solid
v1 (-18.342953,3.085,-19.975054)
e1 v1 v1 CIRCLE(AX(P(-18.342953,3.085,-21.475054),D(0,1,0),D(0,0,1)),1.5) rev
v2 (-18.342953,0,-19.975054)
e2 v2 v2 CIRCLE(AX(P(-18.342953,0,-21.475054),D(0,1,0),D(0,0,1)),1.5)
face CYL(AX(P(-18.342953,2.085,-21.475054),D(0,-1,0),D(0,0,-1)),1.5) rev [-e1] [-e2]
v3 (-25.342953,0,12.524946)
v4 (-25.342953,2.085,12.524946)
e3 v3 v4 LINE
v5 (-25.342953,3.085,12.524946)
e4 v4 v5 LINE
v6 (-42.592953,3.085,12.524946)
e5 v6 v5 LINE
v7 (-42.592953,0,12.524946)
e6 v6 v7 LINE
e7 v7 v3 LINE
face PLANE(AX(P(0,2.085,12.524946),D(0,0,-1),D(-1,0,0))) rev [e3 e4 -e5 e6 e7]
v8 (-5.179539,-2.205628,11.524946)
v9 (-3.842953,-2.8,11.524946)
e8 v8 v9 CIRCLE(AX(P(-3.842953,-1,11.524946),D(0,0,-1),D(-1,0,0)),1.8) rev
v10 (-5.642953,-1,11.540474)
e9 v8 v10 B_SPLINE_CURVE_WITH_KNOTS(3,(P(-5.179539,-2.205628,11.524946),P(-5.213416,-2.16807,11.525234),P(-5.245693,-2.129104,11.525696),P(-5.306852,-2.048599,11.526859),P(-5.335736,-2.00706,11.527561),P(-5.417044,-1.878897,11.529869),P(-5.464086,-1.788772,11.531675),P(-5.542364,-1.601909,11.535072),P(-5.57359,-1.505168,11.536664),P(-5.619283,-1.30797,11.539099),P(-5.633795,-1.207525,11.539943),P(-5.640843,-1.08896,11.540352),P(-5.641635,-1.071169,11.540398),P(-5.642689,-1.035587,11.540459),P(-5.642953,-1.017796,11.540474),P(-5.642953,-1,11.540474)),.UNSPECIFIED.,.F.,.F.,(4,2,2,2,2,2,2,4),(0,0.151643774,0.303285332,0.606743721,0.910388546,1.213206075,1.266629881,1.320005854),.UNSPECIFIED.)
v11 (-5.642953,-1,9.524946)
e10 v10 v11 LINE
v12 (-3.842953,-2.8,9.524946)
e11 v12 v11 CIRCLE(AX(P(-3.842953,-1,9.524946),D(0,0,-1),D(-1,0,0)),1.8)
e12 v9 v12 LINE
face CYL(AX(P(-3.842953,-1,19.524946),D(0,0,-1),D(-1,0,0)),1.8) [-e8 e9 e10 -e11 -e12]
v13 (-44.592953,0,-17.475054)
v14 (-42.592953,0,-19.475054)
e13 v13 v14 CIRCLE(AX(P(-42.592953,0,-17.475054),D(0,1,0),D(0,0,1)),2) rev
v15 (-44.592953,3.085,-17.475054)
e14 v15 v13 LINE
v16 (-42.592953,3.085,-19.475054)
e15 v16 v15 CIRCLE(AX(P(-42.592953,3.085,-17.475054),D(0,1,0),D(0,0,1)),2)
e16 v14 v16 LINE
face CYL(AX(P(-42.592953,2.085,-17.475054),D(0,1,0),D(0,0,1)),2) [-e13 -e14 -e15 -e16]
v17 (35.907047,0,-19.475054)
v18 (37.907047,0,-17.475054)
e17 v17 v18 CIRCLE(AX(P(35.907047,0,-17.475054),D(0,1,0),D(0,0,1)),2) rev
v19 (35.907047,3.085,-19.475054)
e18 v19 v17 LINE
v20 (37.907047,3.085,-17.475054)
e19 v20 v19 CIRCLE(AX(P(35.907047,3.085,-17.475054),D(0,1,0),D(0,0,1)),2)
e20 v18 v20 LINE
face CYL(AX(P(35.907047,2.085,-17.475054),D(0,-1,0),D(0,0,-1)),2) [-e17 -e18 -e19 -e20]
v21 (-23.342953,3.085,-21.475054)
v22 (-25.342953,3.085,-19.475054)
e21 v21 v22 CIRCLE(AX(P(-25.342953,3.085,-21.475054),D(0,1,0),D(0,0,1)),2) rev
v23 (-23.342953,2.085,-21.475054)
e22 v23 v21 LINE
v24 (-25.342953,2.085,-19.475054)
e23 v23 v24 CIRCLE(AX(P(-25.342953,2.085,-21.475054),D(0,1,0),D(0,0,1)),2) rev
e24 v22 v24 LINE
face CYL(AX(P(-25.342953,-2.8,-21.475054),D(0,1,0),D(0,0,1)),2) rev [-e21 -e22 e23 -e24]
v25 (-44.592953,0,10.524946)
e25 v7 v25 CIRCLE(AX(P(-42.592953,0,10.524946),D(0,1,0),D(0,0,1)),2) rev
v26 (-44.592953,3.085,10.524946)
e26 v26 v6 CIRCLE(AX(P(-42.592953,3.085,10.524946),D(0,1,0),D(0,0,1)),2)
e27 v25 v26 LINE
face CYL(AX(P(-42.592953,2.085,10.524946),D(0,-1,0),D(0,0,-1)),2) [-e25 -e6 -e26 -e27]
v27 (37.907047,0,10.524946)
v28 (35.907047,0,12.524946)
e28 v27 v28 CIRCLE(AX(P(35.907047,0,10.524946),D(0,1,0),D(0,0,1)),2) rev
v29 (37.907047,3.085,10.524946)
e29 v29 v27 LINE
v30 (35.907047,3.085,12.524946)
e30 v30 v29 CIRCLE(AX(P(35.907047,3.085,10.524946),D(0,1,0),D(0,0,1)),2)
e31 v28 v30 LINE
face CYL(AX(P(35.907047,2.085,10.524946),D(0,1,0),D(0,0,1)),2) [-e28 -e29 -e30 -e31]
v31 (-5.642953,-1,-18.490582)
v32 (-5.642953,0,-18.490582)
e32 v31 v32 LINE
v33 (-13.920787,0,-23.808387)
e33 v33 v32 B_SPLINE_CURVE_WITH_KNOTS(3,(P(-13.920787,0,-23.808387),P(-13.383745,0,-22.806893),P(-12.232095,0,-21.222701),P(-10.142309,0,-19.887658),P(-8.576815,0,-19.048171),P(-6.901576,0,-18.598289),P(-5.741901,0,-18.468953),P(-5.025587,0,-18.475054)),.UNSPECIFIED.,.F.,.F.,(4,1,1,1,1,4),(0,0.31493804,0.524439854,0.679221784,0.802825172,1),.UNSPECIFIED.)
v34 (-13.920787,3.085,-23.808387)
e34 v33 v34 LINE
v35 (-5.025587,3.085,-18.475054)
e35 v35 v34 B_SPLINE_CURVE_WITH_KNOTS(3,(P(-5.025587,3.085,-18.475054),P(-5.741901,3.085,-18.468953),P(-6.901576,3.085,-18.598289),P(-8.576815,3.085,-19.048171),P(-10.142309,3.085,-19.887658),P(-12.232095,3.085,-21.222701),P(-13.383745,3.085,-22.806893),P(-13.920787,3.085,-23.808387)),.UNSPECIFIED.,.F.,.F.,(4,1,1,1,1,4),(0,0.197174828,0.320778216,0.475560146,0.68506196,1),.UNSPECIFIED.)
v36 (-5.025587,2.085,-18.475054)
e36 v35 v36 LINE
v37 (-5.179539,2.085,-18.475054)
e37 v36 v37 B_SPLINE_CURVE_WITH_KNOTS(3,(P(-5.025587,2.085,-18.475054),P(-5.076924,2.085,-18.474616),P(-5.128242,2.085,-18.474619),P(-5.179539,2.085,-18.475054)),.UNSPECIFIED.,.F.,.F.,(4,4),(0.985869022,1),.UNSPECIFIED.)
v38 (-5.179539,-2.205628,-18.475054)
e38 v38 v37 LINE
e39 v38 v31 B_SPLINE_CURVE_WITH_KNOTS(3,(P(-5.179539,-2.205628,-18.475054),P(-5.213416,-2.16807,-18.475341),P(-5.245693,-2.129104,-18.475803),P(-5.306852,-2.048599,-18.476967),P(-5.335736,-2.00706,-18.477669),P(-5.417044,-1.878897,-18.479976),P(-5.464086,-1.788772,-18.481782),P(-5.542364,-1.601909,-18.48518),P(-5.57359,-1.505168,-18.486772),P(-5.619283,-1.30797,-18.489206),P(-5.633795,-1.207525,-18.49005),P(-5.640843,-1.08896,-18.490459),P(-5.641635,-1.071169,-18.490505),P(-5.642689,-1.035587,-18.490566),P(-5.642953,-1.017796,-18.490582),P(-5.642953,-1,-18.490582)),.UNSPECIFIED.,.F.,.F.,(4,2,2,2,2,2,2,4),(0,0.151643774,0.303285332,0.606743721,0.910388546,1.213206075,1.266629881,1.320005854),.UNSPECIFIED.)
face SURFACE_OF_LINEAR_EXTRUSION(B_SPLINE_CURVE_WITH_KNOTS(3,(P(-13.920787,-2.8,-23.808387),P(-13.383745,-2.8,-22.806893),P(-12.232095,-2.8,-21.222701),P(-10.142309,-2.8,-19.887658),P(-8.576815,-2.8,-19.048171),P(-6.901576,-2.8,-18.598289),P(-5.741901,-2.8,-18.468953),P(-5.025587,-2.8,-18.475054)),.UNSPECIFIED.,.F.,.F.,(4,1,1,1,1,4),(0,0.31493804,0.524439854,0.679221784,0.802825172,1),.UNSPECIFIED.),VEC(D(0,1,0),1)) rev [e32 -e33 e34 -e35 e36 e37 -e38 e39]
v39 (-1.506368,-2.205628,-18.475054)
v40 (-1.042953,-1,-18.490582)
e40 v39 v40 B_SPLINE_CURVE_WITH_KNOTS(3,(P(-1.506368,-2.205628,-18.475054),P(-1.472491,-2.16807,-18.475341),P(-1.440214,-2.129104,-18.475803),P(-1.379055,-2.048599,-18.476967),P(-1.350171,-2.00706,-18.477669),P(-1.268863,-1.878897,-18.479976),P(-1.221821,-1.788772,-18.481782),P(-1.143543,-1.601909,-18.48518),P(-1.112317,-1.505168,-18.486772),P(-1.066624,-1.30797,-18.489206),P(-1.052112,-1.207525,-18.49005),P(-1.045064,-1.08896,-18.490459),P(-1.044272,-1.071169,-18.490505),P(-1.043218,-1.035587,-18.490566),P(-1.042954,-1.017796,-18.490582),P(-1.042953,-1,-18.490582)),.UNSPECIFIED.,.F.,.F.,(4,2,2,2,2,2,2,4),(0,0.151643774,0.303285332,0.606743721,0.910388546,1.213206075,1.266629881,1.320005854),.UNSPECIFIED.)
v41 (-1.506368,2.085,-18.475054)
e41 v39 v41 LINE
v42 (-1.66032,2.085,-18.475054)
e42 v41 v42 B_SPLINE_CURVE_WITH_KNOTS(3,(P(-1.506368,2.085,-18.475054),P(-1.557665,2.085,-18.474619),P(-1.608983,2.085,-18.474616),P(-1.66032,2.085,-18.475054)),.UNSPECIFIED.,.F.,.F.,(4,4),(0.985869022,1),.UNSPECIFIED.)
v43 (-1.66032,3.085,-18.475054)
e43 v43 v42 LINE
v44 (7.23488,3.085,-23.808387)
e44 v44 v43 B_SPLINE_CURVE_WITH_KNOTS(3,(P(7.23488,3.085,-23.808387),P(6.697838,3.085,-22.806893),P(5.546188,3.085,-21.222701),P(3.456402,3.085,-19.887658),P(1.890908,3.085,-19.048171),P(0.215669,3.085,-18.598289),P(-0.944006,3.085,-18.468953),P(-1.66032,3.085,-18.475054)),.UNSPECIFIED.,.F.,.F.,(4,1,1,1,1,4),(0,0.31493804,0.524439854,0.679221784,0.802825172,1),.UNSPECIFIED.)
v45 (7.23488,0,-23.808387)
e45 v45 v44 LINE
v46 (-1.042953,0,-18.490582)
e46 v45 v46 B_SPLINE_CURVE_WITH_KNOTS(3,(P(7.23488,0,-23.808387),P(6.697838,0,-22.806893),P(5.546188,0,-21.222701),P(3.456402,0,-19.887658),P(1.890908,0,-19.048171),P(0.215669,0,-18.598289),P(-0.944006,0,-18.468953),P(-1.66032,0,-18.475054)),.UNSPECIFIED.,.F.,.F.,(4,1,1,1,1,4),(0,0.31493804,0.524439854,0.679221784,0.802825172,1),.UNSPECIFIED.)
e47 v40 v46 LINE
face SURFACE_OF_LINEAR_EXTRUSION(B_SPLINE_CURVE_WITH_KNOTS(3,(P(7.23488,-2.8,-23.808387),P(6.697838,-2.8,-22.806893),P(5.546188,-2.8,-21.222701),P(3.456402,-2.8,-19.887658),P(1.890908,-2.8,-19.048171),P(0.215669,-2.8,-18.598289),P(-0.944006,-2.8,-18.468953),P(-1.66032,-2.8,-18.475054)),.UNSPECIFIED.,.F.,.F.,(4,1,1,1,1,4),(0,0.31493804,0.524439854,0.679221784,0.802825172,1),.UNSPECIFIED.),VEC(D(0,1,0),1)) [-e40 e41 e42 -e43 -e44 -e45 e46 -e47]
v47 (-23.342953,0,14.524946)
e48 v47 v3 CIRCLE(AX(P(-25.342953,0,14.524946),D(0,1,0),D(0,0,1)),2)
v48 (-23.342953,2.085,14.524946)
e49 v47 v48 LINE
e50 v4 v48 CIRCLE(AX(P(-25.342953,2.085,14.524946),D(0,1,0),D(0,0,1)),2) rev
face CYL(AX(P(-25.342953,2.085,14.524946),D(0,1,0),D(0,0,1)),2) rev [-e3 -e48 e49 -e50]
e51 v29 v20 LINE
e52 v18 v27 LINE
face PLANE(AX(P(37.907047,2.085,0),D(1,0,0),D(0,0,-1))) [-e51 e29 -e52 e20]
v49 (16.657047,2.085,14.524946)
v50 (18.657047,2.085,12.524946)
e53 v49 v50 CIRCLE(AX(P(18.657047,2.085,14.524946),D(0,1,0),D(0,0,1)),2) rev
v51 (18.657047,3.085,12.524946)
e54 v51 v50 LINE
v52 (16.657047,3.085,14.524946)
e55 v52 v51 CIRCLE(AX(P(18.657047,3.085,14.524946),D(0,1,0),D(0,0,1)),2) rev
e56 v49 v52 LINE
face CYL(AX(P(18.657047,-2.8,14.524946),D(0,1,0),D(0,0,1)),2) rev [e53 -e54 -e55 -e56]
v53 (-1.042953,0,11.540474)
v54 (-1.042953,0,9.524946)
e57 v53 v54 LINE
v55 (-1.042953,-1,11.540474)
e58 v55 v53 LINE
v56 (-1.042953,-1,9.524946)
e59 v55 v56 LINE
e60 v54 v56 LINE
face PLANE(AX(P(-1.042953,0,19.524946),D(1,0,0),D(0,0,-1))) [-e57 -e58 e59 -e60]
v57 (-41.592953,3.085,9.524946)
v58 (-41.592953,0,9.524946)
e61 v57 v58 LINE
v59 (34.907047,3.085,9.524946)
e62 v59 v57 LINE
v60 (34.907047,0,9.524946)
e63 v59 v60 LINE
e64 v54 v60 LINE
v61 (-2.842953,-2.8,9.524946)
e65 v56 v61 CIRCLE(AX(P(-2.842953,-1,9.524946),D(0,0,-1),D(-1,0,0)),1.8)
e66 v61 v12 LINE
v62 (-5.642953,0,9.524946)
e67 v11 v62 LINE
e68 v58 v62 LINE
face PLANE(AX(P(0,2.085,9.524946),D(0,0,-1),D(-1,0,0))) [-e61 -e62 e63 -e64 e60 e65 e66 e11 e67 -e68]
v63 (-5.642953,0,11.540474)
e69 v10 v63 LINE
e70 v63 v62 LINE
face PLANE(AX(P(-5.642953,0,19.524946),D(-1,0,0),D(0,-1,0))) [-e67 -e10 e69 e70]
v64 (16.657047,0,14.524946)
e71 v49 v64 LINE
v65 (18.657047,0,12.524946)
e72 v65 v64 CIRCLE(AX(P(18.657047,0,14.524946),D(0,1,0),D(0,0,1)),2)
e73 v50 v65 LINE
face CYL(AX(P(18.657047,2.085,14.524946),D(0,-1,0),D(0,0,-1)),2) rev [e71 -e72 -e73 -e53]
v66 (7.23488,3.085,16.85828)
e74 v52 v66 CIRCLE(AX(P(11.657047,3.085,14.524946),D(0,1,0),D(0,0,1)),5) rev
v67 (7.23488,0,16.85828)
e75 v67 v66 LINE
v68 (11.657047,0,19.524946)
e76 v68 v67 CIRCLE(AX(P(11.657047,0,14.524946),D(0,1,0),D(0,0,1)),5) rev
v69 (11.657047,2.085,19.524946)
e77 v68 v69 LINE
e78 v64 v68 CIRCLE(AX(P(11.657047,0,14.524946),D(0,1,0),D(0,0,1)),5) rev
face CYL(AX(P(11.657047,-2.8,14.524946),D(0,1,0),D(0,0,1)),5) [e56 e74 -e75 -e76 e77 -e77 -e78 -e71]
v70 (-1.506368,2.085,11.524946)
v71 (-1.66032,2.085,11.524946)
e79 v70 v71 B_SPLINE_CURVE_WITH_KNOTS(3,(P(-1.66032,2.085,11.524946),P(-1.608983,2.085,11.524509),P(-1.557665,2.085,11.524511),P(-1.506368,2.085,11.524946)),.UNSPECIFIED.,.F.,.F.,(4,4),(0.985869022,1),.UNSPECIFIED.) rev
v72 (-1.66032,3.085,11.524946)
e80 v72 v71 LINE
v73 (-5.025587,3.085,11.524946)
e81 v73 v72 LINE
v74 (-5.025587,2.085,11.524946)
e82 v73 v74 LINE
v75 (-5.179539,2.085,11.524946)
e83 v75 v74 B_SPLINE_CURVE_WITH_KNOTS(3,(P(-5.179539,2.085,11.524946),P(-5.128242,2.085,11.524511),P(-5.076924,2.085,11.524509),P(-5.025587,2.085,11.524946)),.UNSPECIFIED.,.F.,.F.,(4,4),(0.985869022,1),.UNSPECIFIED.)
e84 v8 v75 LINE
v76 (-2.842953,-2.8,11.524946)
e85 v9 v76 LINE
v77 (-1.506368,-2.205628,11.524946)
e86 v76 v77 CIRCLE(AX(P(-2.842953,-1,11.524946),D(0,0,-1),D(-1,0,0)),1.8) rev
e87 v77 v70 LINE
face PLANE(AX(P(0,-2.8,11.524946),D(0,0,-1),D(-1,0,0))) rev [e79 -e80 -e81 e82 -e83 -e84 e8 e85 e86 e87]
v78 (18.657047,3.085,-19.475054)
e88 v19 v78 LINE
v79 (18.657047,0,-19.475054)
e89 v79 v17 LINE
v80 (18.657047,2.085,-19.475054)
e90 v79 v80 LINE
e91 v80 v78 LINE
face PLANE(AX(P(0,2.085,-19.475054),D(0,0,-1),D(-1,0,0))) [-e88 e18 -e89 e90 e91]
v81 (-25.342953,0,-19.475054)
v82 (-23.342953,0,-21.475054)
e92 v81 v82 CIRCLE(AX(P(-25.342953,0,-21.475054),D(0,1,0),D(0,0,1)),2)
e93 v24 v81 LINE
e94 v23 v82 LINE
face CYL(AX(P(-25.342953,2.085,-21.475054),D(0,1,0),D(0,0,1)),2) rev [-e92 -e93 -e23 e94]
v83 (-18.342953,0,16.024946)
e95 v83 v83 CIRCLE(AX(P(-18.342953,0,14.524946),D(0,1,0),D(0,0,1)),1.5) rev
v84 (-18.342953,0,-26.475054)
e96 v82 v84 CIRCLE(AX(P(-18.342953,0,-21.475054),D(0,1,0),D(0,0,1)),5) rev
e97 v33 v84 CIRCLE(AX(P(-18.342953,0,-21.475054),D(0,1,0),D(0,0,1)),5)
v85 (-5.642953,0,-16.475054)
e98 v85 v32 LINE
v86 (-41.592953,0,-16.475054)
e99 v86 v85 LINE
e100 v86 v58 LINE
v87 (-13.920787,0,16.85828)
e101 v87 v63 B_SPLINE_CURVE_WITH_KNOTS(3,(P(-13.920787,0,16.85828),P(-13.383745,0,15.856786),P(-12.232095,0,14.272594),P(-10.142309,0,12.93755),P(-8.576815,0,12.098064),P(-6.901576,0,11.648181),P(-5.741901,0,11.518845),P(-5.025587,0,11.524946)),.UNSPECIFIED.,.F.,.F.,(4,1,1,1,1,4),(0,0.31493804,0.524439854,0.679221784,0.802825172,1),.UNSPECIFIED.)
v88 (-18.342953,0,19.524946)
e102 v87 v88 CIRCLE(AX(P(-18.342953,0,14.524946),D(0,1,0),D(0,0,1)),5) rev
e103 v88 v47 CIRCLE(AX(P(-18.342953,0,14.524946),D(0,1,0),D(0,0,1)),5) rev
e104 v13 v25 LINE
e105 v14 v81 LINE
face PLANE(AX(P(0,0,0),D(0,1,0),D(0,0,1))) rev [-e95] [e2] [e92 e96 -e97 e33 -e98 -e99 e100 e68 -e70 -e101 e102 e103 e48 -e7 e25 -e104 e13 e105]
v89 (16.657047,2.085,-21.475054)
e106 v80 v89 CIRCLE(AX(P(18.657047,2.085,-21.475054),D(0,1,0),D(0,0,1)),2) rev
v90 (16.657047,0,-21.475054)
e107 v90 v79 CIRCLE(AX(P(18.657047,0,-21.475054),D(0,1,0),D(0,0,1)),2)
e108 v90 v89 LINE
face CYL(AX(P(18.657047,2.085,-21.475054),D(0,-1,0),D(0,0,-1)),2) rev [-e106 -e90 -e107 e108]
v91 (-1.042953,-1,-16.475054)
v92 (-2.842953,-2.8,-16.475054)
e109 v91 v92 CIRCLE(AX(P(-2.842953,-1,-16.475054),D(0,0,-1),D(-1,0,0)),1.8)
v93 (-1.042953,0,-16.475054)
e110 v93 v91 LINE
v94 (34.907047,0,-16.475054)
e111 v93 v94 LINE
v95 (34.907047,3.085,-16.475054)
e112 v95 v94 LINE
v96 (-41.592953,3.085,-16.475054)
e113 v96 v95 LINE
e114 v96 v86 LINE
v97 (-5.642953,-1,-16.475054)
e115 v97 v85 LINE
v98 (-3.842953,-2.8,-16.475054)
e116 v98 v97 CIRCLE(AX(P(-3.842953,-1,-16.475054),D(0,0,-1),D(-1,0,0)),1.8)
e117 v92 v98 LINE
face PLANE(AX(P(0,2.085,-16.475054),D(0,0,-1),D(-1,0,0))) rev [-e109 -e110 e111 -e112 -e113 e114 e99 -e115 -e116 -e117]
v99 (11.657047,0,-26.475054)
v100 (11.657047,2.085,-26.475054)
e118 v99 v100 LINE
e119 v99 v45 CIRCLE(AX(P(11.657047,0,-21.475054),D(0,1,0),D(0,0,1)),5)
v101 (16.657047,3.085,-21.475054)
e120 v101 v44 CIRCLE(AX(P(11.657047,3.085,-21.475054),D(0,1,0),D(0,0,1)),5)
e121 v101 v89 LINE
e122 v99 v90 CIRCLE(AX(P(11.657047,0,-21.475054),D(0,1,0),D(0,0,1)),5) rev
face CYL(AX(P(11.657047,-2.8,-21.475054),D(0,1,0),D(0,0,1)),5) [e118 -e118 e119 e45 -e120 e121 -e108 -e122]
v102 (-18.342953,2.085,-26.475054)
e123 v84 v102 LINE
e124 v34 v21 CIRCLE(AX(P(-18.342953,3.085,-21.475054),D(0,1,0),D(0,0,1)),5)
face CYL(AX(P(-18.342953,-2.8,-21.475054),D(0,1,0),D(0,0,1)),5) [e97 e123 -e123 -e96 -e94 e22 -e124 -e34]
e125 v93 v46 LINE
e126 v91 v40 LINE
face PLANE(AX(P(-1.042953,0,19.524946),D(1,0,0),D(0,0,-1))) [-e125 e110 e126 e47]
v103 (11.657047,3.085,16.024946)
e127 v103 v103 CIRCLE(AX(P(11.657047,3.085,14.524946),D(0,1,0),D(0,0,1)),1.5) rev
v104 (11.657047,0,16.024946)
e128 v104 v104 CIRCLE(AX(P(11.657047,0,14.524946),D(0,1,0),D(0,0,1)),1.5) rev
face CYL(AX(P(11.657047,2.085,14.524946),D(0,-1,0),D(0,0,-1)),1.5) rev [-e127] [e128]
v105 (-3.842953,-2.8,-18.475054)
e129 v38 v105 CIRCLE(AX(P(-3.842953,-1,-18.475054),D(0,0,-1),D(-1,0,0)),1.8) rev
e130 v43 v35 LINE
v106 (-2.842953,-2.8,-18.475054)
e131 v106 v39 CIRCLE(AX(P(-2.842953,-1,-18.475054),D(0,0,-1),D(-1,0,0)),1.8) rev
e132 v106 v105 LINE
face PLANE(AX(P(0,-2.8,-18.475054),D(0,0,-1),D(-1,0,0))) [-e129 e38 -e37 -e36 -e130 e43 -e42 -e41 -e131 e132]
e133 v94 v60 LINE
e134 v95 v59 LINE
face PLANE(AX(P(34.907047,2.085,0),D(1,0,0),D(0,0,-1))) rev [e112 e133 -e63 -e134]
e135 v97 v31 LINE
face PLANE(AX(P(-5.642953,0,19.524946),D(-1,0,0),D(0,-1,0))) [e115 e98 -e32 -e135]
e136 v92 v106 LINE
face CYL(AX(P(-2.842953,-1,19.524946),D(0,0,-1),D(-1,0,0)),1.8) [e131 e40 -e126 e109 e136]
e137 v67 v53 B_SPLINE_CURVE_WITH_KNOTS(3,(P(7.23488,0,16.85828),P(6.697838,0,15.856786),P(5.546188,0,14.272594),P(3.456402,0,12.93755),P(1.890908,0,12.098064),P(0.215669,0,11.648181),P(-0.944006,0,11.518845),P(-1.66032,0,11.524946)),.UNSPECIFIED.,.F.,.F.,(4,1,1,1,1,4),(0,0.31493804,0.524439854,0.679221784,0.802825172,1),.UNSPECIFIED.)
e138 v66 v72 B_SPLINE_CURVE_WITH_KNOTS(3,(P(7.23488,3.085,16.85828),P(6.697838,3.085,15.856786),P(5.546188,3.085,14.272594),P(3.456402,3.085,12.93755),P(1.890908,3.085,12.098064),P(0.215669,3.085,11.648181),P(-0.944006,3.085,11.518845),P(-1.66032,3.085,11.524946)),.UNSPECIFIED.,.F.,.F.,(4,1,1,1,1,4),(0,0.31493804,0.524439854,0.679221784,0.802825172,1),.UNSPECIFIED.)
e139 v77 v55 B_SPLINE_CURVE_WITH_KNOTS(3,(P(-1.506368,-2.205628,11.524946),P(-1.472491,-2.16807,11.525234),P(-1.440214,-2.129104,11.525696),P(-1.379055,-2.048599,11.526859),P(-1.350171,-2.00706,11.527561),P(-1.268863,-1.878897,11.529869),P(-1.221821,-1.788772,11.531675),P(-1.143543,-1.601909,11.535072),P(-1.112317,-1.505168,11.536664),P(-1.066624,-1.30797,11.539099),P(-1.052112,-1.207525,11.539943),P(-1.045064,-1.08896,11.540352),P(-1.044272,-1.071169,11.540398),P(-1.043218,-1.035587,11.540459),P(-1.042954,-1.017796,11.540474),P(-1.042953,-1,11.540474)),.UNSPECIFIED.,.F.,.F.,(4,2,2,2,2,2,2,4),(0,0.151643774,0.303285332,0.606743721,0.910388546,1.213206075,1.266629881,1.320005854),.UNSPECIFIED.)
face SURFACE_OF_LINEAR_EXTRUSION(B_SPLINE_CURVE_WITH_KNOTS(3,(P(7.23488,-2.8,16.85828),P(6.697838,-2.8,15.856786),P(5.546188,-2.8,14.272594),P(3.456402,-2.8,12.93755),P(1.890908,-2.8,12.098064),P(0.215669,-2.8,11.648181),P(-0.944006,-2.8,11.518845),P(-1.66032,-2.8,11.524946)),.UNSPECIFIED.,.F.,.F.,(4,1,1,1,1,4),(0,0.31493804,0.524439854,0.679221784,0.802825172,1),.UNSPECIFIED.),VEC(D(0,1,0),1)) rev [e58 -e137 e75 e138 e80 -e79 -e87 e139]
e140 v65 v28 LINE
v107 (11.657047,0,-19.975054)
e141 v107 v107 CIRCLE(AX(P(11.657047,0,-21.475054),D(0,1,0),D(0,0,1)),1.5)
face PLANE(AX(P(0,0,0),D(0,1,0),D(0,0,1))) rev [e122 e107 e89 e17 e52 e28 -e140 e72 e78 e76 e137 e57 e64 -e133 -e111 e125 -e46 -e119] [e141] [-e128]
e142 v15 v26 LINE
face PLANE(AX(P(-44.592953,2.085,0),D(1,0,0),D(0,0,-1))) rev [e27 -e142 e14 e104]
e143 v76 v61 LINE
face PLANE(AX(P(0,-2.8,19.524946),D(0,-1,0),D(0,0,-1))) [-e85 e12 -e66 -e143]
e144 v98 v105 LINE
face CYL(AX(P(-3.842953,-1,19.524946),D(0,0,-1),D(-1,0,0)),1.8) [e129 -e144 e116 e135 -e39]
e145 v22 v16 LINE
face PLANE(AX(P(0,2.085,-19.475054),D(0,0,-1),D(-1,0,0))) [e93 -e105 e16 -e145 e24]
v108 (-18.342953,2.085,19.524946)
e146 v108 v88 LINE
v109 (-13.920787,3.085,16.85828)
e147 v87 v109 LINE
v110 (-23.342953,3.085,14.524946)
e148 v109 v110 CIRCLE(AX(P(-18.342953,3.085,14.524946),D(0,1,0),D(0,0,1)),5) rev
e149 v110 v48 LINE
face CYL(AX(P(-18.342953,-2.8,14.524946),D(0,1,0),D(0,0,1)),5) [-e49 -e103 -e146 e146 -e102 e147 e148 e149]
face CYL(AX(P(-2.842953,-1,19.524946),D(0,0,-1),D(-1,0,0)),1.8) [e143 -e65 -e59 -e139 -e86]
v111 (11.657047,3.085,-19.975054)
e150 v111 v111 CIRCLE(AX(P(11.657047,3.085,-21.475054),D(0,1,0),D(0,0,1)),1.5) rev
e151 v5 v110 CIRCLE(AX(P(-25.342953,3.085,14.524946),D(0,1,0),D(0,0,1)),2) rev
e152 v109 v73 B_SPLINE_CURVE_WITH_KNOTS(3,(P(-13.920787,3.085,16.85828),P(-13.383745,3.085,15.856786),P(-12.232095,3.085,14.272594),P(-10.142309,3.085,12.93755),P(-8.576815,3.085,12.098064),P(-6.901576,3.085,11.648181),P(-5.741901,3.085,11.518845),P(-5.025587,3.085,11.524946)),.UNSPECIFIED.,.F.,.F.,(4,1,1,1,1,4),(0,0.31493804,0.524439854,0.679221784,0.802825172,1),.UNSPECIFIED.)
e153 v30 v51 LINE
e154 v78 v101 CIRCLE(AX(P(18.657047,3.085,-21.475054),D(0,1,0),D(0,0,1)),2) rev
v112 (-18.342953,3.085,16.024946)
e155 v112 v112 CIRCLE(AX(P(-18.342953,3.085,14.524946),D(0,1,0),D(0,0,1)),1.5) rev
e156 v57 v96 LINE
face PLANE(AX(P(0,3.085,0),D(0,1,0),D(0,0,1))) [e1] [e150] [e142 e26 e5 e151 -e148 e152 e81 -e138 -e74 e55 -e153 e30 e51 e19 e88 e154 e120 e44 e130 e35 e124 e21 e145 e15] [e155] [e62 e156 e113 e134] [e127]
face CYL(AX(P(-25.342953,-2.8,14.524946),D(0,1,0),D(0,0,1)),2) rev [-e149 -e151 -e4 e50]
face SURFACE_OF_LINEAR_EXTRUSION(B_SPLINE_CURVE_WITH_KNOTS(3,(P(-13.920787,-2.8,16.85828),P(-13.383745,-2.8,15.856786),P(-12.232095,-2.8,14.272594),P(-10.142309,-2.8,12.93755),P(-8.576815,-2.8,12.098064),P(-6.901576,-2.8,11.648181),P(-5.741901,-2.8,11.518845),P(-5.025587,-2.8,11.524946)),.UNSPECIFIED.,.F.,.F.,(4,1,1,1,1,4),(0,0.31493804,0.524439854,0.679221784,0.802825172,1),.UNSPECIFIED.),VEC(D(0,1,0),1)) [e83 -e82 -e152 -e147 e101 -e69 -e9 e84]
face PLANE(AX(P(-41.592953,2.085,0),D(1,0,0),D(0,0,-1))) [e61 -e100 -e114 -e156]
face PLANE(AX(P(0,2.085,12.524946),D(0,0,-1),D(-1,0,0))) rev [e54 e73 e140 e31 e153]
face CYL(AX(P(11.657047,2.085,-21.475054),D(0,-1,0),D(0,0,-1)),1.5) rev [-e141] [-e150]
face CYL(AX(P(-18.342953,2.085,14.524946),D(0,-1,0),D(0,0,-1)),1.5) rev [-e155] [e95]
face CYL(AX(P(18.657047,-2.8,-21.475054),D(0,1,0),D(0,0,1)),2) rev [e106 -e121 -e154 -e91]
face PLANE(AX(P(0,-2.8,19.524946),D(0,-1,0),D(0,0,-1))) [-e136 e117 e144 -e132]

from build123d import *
from build123d.topology import SkipClean

# Parameters (mm, degrees)
SKETCH1_W           = 40
SKETCH1_H           = 7
SKETCH1_R           = 1.5
SKETCH1_W_2         = 82.5
SKETCH1_H_2         = 32
SKETCH1_W_3         = 76.5
SKETCH1_H_3         = 26
BOSS_EXTRUDE1_DEPTH = 2.085
SKETCH2_W           = 5
SKETCH2_H           = 10
BOSS_EXTRUDE2_DEPTH = 3
FILLET1_R           = 2
FILLET2_R           = 2
CUT_EXTRUDE1_DEPTH  = 65.136818612
SKETCH4_W           = 30
SKETCH4_H           = 6.817038716
CUT_EXTRUDE2_DEPTH  = 53.089568977
FILLET3_R           = 5
FILLET4_R           = 2
BOSS_EXTRUDE3_START = 1
SKETCH5_R           = 1.5
BOSS_EXTRUDE3_DEPTH = 1
FILLET5_START       = 2.085
FILLET5_DEPTH       = 1


with BuildPart() as part:
    # Sketch1 → Boss-Extrude1 (new body)
    # profile 1 of 3: a face of its own
    with BuildSketch(Plane(origin=(0, 0, 0), x_dir=(1, 0, 0), z_dir=(0, 1, 0))):
        with Locations((-3.342953498, -16.024946279)):
            Rectangle(SKETCH1_W, SKETCH1_H)
        with Locations(Location((-18.342953498, -14.524946279, 0), (0, 0, 270))):
            Circle(SKETCH1_R, mode=Mode.SUBTRACT)
        with Locations(Location((11.657046502, -14.524946279, 0), (0, 0, 270))):
            Circle(SKETCH1_R, mode=Mode.SUBTRACT)
    # profile 2 of 3: a face of its own
    with BuildSketch(Plane(origin=(0, 0, 0), x_dir=(1, 0, 0), z_dir=(0, 1, 0))):
        with Locations((-3.342953498, 3.475053721)):
            Rectangle(SKETCH1_W_2, SKETCH1_H_2)
        with Locations((-3.342953498, 3.475053721)):
            Rectangle(SKETCH1_W_3, SKETCH1_H_3, mode=Mode.SUBTRACT)
    # profile 3 of 3: a face of its own
    with BuildSketch(Plane(origin=(0, 0, 0), x_dir=(1, 0, 0), z_dir=(0, 1, 0))):
        with Locations((-3.342953498, 22.975053721)):
            Rectangle(SKETCH1_W, SKETCH1_H)
        with Locations(Location((-18.342953498, 21.475053721, 0), (0, 0, 270))):
            Circle(SKETCH1_R, mode=Mode.SUBTRACT)
        with Locations(Location((11.657046502, 21.475053721, 0), (0, 0, 270))):
            Circle(SKETCH1_R, mode=Mode.SUBTRACT)
    extrude(amount=BOSS_EXTRUDE1_DEPTH)

    # Sketch2 → Boss-Extrude2 (add)
    with BuildSketch(Plane.XZ):
        with Locations((-3.342953498, 14.524946279)):
            Rectangle(SKETCH2_W, SKETCH2_H)
        with Locations((-3.342953498, -21.475053721)):
            Rectangle(SKETCH2_W, SKETCH2_H)
    extrude(amount=BOSS_EXTRUDE2_DEPTH)

    # Fillet1
    fillet1_edges = [part.edges().sort_by_distance(p)[0] for p in [
        (-5.842953498, -3, 14.524946279),
        (-0.842953498, -3, 14.524946279),
        (-0.842953498, -3, -21.475053721),
        (-5.842953498, -3, -21.475053721),
    ]]
    fillet(fillet1_edges, radius=FILLET1_R)

    # Fillet2
    fillet2_edges = [part.edges().sort_by_distance(p)[0] for p in [
        (-44.592953498, 1.0425, 12.524946279),
        (-44.592953498, 1.0425, -19.475053721),
        (37.907046502, 1.0425, -19.475053721),
        (37.907046502, 1.0425, 12.524946279),
    ]]
    fillet(fillet2_edges, radius=FILLET2_R)

    # Sketch3 → Cut-Extrude1 (cut, through all)
    with BuildSketch(Plane(origin=(0, 0, -26.475053721), x_dir=(-1, 0, 0), z_dir=(0, 0, -1))):
        with BuildLine():
            Line((5.842953498, -1), (5.842953498, 0))
            Line((5.842953498, 0), (5.642953498, 0))
            Line((5.642953498, 0), (5.642953498, -1))
            ThreePointArc((5.642953498, -1), (5.115745704, -2.272792206), (3.842953498, -2.8))
            Line((3.842953498, -2.8), (2.842953498, -2.8))
            ThreePointArc((2.842953498, -2.8), (1.570161291, -2.272792206), (1.042953498, -1))
            Line((1.042953498, -1), (1.042953498, 0))
            Line((1.042953498, 0), (0.842953498, 0))
            Line((0.842953498, 0), (0.842953498, -1))
            ThreePointArc((0.842953498, -1), (1.428739935, -2.414213562), (2.842953498, -3))
            Line((2.842953498, -3), (3.842953498, -3))
            ThreePointArc((3.842953498, -3), (5.25716706, -2.414213562), (5.842953498, -1))
        make_face()
    extrude(amount=-CUT_EXTRUDE1_DEPTH, mode=Mode.SUBTRACT)

    # Sketch4 → Cut-Extrude2 (cut, through all)
    with BuildSketch(Plane(origin=(0, 2.085, 0), x_dir=(1, 0, 0), z_dir=(0, 1, 0))):
        with BuildLine():
            Line((-5.025587433, 18.475053721), (-3.342953498, 18.475053721))
            Line((-3.342953498, 18.475053721), (-1.660319563, 18.475053721))
            Line((-1.660319563, 18.475053721), (-1.5063675, 18.475053721))
            add(Edge.make_bspline(
                [(7.234880115, 23.808387054), (6.697838422, 22.80689338), (5.54618786, 21.222701251), (3.456402004, 19.887657692), (1.890908212, 19.048171258), (0.265447838, 18.611656881), (-0.841891354, 18.480685845), (-1.5063675, 18.475053721)],
                knots=[0, 0, 0, 0, 0.31493804, 0.524439854, 0.679221784, 0.802825172, 0.985869019, 0.985869019, 0.985869019, 0.985869019], degree=3))
            ThreePointArc((7.234880115, 23.808387054), (9.075057605, 25.756797914), (11.657046502, 26.475053721))
            Line((11.657046502, 26.475053721), (-18.342953498, 26.475053721))
            ThreePointArc((-18.342953498, 26.475053721), (-15.7609646, 25.756797914), (-13.92078711, 23.808387054))
            add(Edge.make_bspline(
                [(-13.92078711, 23.808387054), (-13.383745417, 22.80689338), (-12.232094855, 21.222701251), (-10.142308999, 19.887657692), (-8.576815207, 19.048171258), (-6.951354833, 18.611656881), (-5.844015641, 18.480685845), (-5.179539495, 18.475053721)],
                knots=[0, 0, 0, 0, 0.31493804, 0.524439854, 0.679221784, 0.802825172, 0.985869019, 0.985869019, 0.985869019, 0.985869019], degree=3))
            Line((-5.179539495, 18.475053721), (-5.025587433, 18.475053721))
        make_face()
        with Locations((-3.342953498, 29.883573079)):
            Rectangle(SKETCH4_W, SKETCH4_H)
        with BuildLine():
            ThreePointArc((-13.92078711, -16.858279612), (-15.7609646, -18.806690472), (-18.342953498, -19.524946279))
            Line((-18.342953498, -19.524946279), (11.657046502, -19.524946279))
            ThreePointArc((11.657046502, -19.524946279), (9.075057605, -18.806690472), (7.234880115, -16.858279612))
            add(Edge.make_bspline(
                [(7.234880115, -16.858279612), (6.697838422, -15.856785937), (5.54618786, -14.272593809), (3.456402004, -12.937550249), (1.890908212, -12.098063816), (0.265447838, -11.661549439), (-0.841891354, -11.530578403), (-1.5063675, -11.524946279)],
                knots=[0, 0, 0, 0, 0.31493804, 0.524439854, 0.679221784, 0.802825172, 0.985869019, 0.985869019, 0.985869019, 0.985869019], degree=3))
            Line((-1.5063675, -11.524946279), (-1.660319563, -11.524946279))
            Line((-1.660319563, -11.524946279), (-3.342953498, -11.524946279))
            Line((-3.342953498, -11.524946279), (-5.025587433, -11.524946279))
            Line((-5.025587433, -11.524946279), (-5.179539495, -11.524946279))
            add(Edge.make_bspline(
                [(-13.92078711, -16.858279612), (-13.383745417, -15.856785937), (-12.232094855, -14.272593809), (-10.142308999, -12.937550249), (-8.576815207, -12.098063816), (-6.951354833, -11.661549439), (-5.844015641, -11.530578403), (-5.179539495, -11.524946279)],
                knots=[0, 0, 0, 0, 0.31493804, 0.524439854, 0.679221784, 0.802825172, 0.985869019, 0.985869019, 0.985869019, 0.985869019], degree=3))
        make_face()
        with Locations((-3.342953498, -22.933465637)):
            Rectangle(SKETCH4_W, SKETCH4_H)
    extrude(amount=-CUT_EXTRUDE2_DEPTH, mode=Mode.SUBTRACT)

    # Fillet3
    fillet3_edges = [part.edges().sort_by_distance(p)[0] for p in [
        (16.657046502, 1.0425, -26.475053721),
        (-23.342953498, 1.0425, -26.475053721),
        (-23.342953498, 1.0425, 19.524946279),
        (16.657046502, 1.0425, 19.524946279),
    ]]
    fillet(fillet3_edges, radius=FILLET3_R - 0.0001)  # a hair under: the kernel refuses the full size

    # Fillet4
    fillet4_edges = [part.edges().sort_by_distance(p)[0] for p in [
        (-23.342953498, 1.0425, 12.524946279),
        (-23.342953498, 1.0425, -19.475053721),
        (16.657046502, 1.0425, -19.475053721),
        (16.657046502, 1.0425, 12.524946279),
    ]]
    fillet(fillet4_edges, radius=FILLET4_R)

    # Sketch5 → Boss-Extrude3 (add)
    # profile 1 of 26: a face of its own
    with SkipClean():  # the faces are left unmerged after this step: merging them gives an invalid solid
        with BuildSketch(Plane(origin=(0, 2.085, 0), x_dir=(1, 0, 0), z_dir=(0, 1, 0)).offset(BOSS_EXTRUDE3_START)):
            with BuildLine():
                ThreePointArc((-18.343003498, 26.475053721), (-21.878490939, 25.010584091), (-23.342953497, 21.475093721))
                ThreePointArc((-23.342953497, 21.475093721), (-23.237489148, 20.453525081), (-22.925529193, 19.475053721))
                Line((-22.925529193, 19.475053721), (-14.342953498, 19.475053721))
                Line((-14.342953498, 19.475053721), (-14.342953498, 24.475053721))
                ThreePointArc((-14.342953498, 24.475053721), (-16.106907881, 25.947200856), (-18.343003498, 26.475053721))
            make_face()
            with Locations((-18.342953498, 21.475053721)):
                Circle(SKETCH5_R, mode=Mode.SUBTRACT)
        # profile 2 of 26: a face of its own
        with BuildSketch(Plane(origin=(0, 2.085, 0), x_dir=(1, 0, 0), z_dir=(0, 1, 0)).offset(BOSS_EXTRUDE3_START)):
            with BuildLine():
                Line((-22.925529193, 19.475053721), (-23.342953498, 19.475053721))
                Line((-23.342953498, 19.475053721), (-23.342953498, 16.475053721))
                Line((-23.342953498, 16.475053721), (-18.342953499, 16.475053721))
                ThreePointArc((-18.342953499, 16.475053721), (-21.081566286, 17.291753589), (-22.925529193, 19.475053721))
            make_face()
        # profile 3 of 26: a face of its own
        with BuildSketch(Plane(origin=(0, 2.085, 0), x_dir=(1, 0, 0), z_dir=(0, 1, 0)).offset(BOSS_EXTRUDE3_START)):
            with BuildLine():
                Line((-23.342953498, 16.475053721), (-23.342953498, 19.475053721))
                Line((-23.342953498, 19.475053721), (-25.342953498, 19.475053721))
                Line((-25.342953498, 19.475053721), (-42.592953498, 19.475053721))
                ThreePointArc((-42.592953498, 19.475053721), (-44.00716706, 18.889267283), (-44.592953498, 17.475053721))
                Line((-44.592953498, 17.475053721), (-44.592953498, -10.524946279))
                ThreePointArc((-44.592953498, -10.524946279), (-44.00716706, -11.939159841), (-42.592953498, -12.524946279))
                Line((-42.592953498, -12.524946279), (-25.342953498, -12.524946279))
                Line((-25.342953498, -12.524946279), (-23.342953498, -12.524946279))
                Line((-23.342953498, -12.524946279), (-23.342953498, -9.524946279))
                Line((-23.342953498, -9.524946279), (-41.592953498, -9.524946279))
                Line((-41.592953498, -9.524946279), (-41.592953498, 16.475053721))
                Line((-41.592953498, 16.475053721), (-23.342953498, 16.475053721))
            make_face()
        # profile 4 of 26: a face of its own
        with BuildSketch(Plane(origin=(0, 2.085, 0), x_dir=(1, 0, 0), z_dir=(0, 1, 0)).offset(BOSS_EXTRUDE3_START)):
            with BuildLine():
                Line((-14.342953498, 19.475053721), (-22.925529193, 19.475053721))
                ThreePointArc((-22.925529193, 19.475053721), (-21.081566286, 17.291753589), (-18.342953499, 16.475053721))
                ThreePointArc((-18.342953499, 16.475053721), (-16.106885521, 17.002917766), (-14.342953498, 18.475053721))
                Line((-14.342953498, 18.475053721), (-14.342953498, 19.475053721))
            make_face()
        # profile 5 of 26: a face of its own
        with BuildSketch(Plane(origin=(0, 2.085, 0), x_dir=(1, 0, 0), z_dir=(0, 1, 0)).offset(BOSS_EXTRUDE3_START)):
            with BuildLine():
                ThreePointArc((-13.92078711, 23.808387054), (-14.118698205, 24.150061614), (-14.342953498, 24.475053721))
                Line((-14.342953498, 24.475053721), (-14.342953498, 19.475053721))
                Line((-14.342953498, 19.475053721), (-13.760377803, 19.475053721))
                ThreePointArc((-13.760377803, 19.475053721), (-13.448421933, 20.453505503), (-13.342953498, 21.475053721))
                ThreePointArc((-13.342953498, 21.475053721), (-13.489561285, 22.676962217), (-13.92078711, 23.808387054))
            make_face()
        # profile 6 of 26: a face of its own
        with BuildSketch(Plane(origin=(0, 2.085, 0), x_dir=(1, 0, 0), z_dir=(0, 1, 0)).offset(BOSS_EXTRUDE3_START)):
            with BuildLine():
                Line((-13.760377803, 19.475053721), (-14.342953498, 19.475053721))
                Line((-14.342953498, 19.475053721), (-14.342953498, 18.475053721))
                ThreePointArc((-14.342953498, 18.475053721), (-14.022635061, 18.958141206), (-13.760377803, 19.475053721))
            make_face()
        # profile 7 of 26: a face of its own
        with BuildSketch(Plane(origin=(0, 2.085, 0), x_dir=(1, 0, 0), z_dir=(0, 1, 0)).offset(BOSS_EXTRUDE3_START)):
            with BuildLine():
                ThreePointArc((-14.342953498, 18.475053721), (-16.106885521, 17.002917766), (-18.342953499, 16.475053721))
                Line((-18.342953499, 16.475053721), (11.657046523, 16.475053721))
                ThreePointArc((11.657046523, 16.475053721), (9.420978534, 17.002917762), (7.657046502, 18.475053721))
                Line((7.657046502, 18.475053721), (-1.5063675, 18.475053721))
                add(Edge.make_bspline(
                    [(-1.5063675, 18.475053721), (-1.557665042, 18.474618921), (-1.608983344, 18.47461649), (-1.660319563, 18.475053721)],
                    knots=[0.985869019, 0.985869019, 0.985869019, 0.985869019, 1, 1, 1, 1], degree=3))
                Line((-1.660319563, 18.475053721), (-3.342953498, 18.475053721))
                Line((-3.342953498, 18.475053721), (-5.025587433, 18.475053721))
                add(Edge.make_bspline(
                    [(-5.179539495, 18.475053721), (-5.128241953, 18.474618921), (-5.076923651, 18.47461649), (-5.025587433, 18.475053721)],
                    knots=[0.985869019, 0.985869019, 0.985869019, 0.985869019, 1, 1, 1, 1], degree=3))
                Line((-5.179539495, 18.475053721), (-14.342953498, 18.475053721))
            make_face()
        # profile 8 of 26: a face of its own
        with BuildSketch(Plane(origin=(0, 2.085, 0), x_dir=(1, 0, 0), z_dir=(0, 1, 0)).offset(BOSS_EXTRUDE3_START)):
            with BuildLine():
                add(Edge.make_bspline(
                    [(-13.92078711, 23.808387054), (-13.383745417, 22.80689338), (-12.232094855, 21.222701251), (-10.424029044, 20.067632367), (-9.557996846, 19.581589064), (-9.354549961, 19.475053721)],
                    knots=[0, 0, 0, 0, 0.31493804, 0.524439854, 0.587657191, 0.587657191, 0.587657191, 0.587657191], degree=3))
                ThreePointArc((-13.92078711, 23.808387054), (-13.489561285, 22.676962217), (-13.342953498, 21.475053721))
                ThreePointArc((-13.342953498, 21.475053721), (-13.448421933, 20.453505503), (-13.760377803, 19.475053721))
                Line((-13.760377803, 19.475053721), (-9.354549961, 19.475053721))
            make_face()
        # profile 9 of 26: a face of its own
        with BuildSketch(Plane(origin=(0, 2.085, 0), x_dir=(1, 0, 0), z_dir=(0, 1, 0)).offset(BOSS_EXTRUDE3_START)):
            with BuildLine():
                ThreePointArc((-13.760377803, 19.475053721), (-14.022635061, 18.958141206), (-14.342953498, 18.475053721))
                Line((-14.342953498, 18.475053721), (-5.179539495, 18.475053721))
                add(Edge.make_bspline(
                    [(-9.354549961, 19.475053721), (-9.059875559, 19.320746917), (-8.354121704, 18.98836733), (-6.951354833, 18.611656881), (-5.844015641, 18.480685845), (-5.179539495, 18.475053721)],
                    knots=[0.587657191, 0.587657191, 0.587657191, 0.587657191, 0.679221784, 0.802825172, 0.985869019, 0.985869019, 0.985869019, 0.985869019], degree=3))
                Line((-9.354549961, 19.475053721), (-13.760377803, 19.475053721))
            make_face()
        # profile 10 of 26: a face of its own
        with BuildSketch(Plane(origin=(0, 2.085, 0), x_dir=(1, 0, 0), z_dir=(0, 1, 0)).offset(BOSS_EXTRUDE3_START)):
            with BuildLine():
                ThreePointArc((16.239622197, 19.475053721), (14.395659298, 17.291753594), (11.657046523, 16.475053721))
                Line((11.657046523, 16.475053721), (16.657046502, 16.475053721))
                Line((16.657046502, 16.475053721), (16.657046502, 19.475053721))
                Line((16.657046502, 19.475053721), (16.239622197, 19.475053721))
            make_face()
        # profile 11 of 26: a face of its own
        with BuildSketch(Plane(origin=(0, 2.085, 0), x_dir=(1, 0, 0), z_dir=(0, 1, 0)).offset(BOSS_EXTRUDE3_START)):
            with BuildLine():
                ThreePointArc((7.657046502, 18.475053721), (9.420978534, 17.002917762), (11.657046523, 16.475053721))
                ThreePointArc((11.657046523, 16.475053721), (14.395659298, 17.291753594), (16.239622197, 19.475053721))
                Line((16.239622197, 19.475053721), (7.074470807, 19.475053721))
                ThreePointArc((7.074470807, 19.475053721), (7.336728066, 18.958141206), (7.657046502, 18.475053721))
            make_face()
        # profile 12 of 26: a face of its own
        with BuildSketch(Plane(origin=(0, 2.085, 0), x_dir=(1, 0, 0), z_dir=(0, 1, 0)).offset(BOSS_EXTRUDE3_START)):
            with BuildLine():
                Line((16.657046502, 19.475053721), (16.657046502, 16.475053721))
                Line((16.657046502, 16.475053721), (34.907046502, 16.475053721))
                Line((34.907046502, 16.475053721), (34.907046502, -9.524946279))
                Line((34.907046502, -9.524946279), (16.657046502, -9.524946279))
                Line((16.657046502, -9.524946279), (16.657046502, -12.524946279))
                Line((16.657046502, -12.524946279), (18.657046502, -12.524946279))
                Line((18.657046502, -12.524946279), (35.907046502, -12.524946279))
                ThreePointArc((35.907046502, -12.524946279), (37.321260065, -11.939159841), (37.907046502, -10.524946279))
                Line((37.907046502, -10.524946279), (37.907046502, 17.475053721))
                ThreePointArc((37.907046502, 17.475053721), (37.321260065, 18.889267283), (35.907046502, 19.475053721))
                Line((35.907046502, 19.475053721), (18.657046502, 19.475053721))
                Line((18.657046502, 19.475053721), (16.657046502, 19.475053721))
            make_face()
        # profile 13 of 26: a face of its own
        with BuildSketch(Plane(origin=(0, 2.085, 0), x_dir=(1, 0, 0), z_dir=(0, 1, 0)).offset(BOSS_EXTRUDE3_START)):
            with BuildLine():
                Line((-1.5063675, 18.475053721), (7.657046502, 18.475053721))
                ThreePointArc((7.657046502, 18.475053721), (7.336728066, 18.958141206), (7.074470807, 19.475053721))
                Line((7.074470807, 19.475053721), (2.668642966, 19.475053721))
                add(Edge.make_bspline(
                    [(2.668642966, 19.475053721), (2.373968563, 19.320746917), (1.668214709, 18.98836733), (0.265447838, 18.611656881), (-0.841891354, 18.480685845), (-1.5063675, 18.475053721)],
                    knots=[0.587657191, 0.587657191, 0.587657191, 0.587657191, 0.679221784, 0.802825172, 0.985869019, 0.985869019, 0.985869019, 0.985869019], degree=3))
            make_face()
        # profile 14 of 26: a face of its own
        with BuildSketch(Plane(origin=(0, 2.085, 0), x_dir=(1, 0, 0), z_dir=(0, 1, 0)).offset(BOSS_EXTRUDE3_START)):
            with BuildLine():
                Line((7.074470807, 19.475053721), (16.239622197, 19.475053721))
                ThreePointArc((16.239622197, 19.475053721), (16.551578067, 20.453505503), (16.657046502, 21.475053721))
                ThreePointArc((16.657046502, 21.475053721), (15.192598086, 25.010569949), (11.657096502, 26.475053721))
                ThreePointArc((11.657096502, 26.475053721), (9.075079014, 25.756810824), (7.234880115, 23.808387054))
                ThreePointArc((7.234880115, 23.808387054), (6.66046873, 21.660014702), (7.074470807, 19.475053721))
            make_face()
            with Locations((11.657046502, 21.475053721)):
                Circle(SKETCH5_R, mode=Mode.SUBTRACT)
        # profile 15 of 26: a face of its own
        with BuildSketch(Plane(origin=(0, 2.085, 0), x_dir=(1, 0, 0), z_dir=(0, 1, 0)).offset(BOSS_EXTRUDE3_START)):
            with BuildLine():
                Line((-18.342953493, -9.524946279), (-23.342953498, -9.524946279))
                Line((-23.342953498, -9.524946279), (-23.342953498, -12.524946279))
                Line((-23.342953498, -12.524946279), (-22.925529193, -12.524946279))
                ThreePointArc((-22.925529193, -12.524946279), (-21.081566283, -10.341646145), (-18.342953493, -9.524946279))
            make_face()
        # profile 16 of 26: a face of its own
        with BuildSketch(Plane(origin=(0, 2.085, 0), x_dir=(1, 0, 0), z_dir=(0, 1, 0)).offset(BOSS_EXTRUDE3_START)):
            with BuildLine():
                add(Edge.make_bspline(
                    [(7.234880115, 23.808387054), (6.697838422, 22.80689338), (5.54618786, 21.222701251), (3.738122049, 20.067632367), (2.872089851, 19.581589064), (2.668642966, 19.475053721)],
                    knots=[0, 0, 0, 0, 0.31493804, 0.524439854, 0.587657191, 0.587657191, 0.587657191, 0.587657191], degree=3))
                Line((2.668642966, 19.475053721), (7.074470807, 19.475053721))
                ThreePointArc((7.074470807, 19.475053721), (6.66046873, 21.660014702), (7.234880115, 23.808387054))
            make_face()
        # profile 17 of 26: a face of its own
        with BuildSketch(Plane(origin=(0, 2.085, 0), x_dir=(1, 0, 0), z_dir=(0, 1, 0)).offset(BOSS_EXTRUDE3_START)):
            with BuildLine():
                Line((11.657046502, -9.524946279), (-18.342953493, -9.524946279))
                ThreePointArc((-18.342953493, -9.524946279), (-16.106885518, -10.052810325), (-14.342953498, -11.524946279))
                Line((-14.342953498, -11.524946279), (-5.179539495, -11.524946279))
                add(Edge.make_bspline(
                    [(-5.179539495, -11.524946279), (-5.128241953, -11.524511479), (-5.076923651, -11.524509048), (-5.025587433, -11.524946279)],
                    knots=[0.985869019, 0.985869019, 0.985869019, 0.985869019, 1, 1, 1, 1], degree=3))
                Line((-5.025587433, -11.524946279), (-3.342953498, -11.524946279))
                Line((-3.342953498, -11.524946279), (-1.660319563, -11.524946279))
                add(Edge.make_bspline(
                    [(-1.5063675, -11.524946279), (-1.557665042, -11.524511479), (-1.608983344, -11.524509048), (-1.660319563, -11.524946279)],
                    knots=[0.985869019, 0.985869019, 0.985869019, 0.985869019, 1, 1, 1, 1], degree=3))
                Line((-1.5063675, -11.524946279), (7.657046502, -11.524946279))
                ThreePointArc((7.657046502, -11.524946279), (9.420978525, -10.052810324), (11.657046502, -9.524946279))
            make_face()
        # profile 18 of 26: a face of its own
        with BuildSketch(Plane(origin=(0, 2.085, 0), x_dir=(1, 0, 0), z_dir=(0, 1, 0)).offset(BOSS_EXTRUDE3_START)):
            with BuildLine():
                ThreePointArc((-14.342953498, -11.524946279), (-16.106885518, -10.052810325), (-18.342953493, -9.524946279))
                ThreePointArc((-18.342953493, -9.524946279), (-21.081566283, -10.341646145), (-22.925529193, -12.524946279))
                Line((-22.925529193, -12.524946279), (-13.760377803, -12.524946279))
                ThreePointArc((-13.760377803, -12.524946279), (-14.022635061, -12.008033764), (-14.342953498, -11.524946279))
            make_face()
        # profile 19 of 26: a face of its own
        with BuildSketch(Plane(origin=(0, 2.085, 0), x_dir=(1, 0, 0), z_dir=(0, 1, 0)).offset(BOSS_EXTRUDE3_START)):
            with BuildLine():
                Line((16.657046502, -9.524946279), (11.657046502, -9.524946279))
                ThreePointArc((11.657046502, -9.524946279), (14.39565929, -10.341646146), (16.239622197, -12.524946279))
                Line((16.239622197, -12.524946279), (16.657046502, -12.524946279))
                Line((16.657046502, -12.524946279), (16.657046502, -9.524946279))
            make_face()
        # profile 20 of 26: a face of its own
        with BuildSketch(Plane(origin=(0, 2.085, 0), x_dir=(1, 0, 0), z_dir=(0, 1, 0)).offset(BOSS_EXTRUDE3_START)):
            with BuildLine():
                ThreePointArc((16.239622197, -12.524946279), (14.39565929, -10.341646146), (11.657046502, -9.524946279))
                ThreePointArc((11.657046502, -9.524946279), (9.420978525, -10.052810324), (7.657046502, -11.524946279))
                ThreePointArc((7.657046502, -11.524946279), (7.336728066, -12.008033764), (7.074470807, -12.524946279))
                Line((7.074470807, -12.524946279), (16.239622197, -12.524946279))
            make_face()
        # profile 21 of 26: a face of its own
        with BuildSketch(Plane(origin=(0, 2.085, 0), x_dir=(1, 0, 0), z_dir=(0, 1, 0)).offset(BOSS_EXTRUDE3_START)):
            with BuildLine():
                Line((-5.179539495, -11.524946279), (-14.342953498, -11.524946279))
                ThreePointArc((-14.342953498, -11.524946279), (-14.022635061, -12.008033764), (-13.760377803, -12.524946279))
                Line((-13.760377803, -12.524946279), (-9.354549961, -12.524946279))
                add(Edge.make_bspline(
                    [(-9.354549961, -12.524946279), (-9.059875559, -12.370639475), (-8.354121704, -12.038259888), (-6.951354833, -11.661549439), (-5.844015641, -11.530578403), (-5.179539495, -11.524946279)],
                    knots=[0.587657191, 0.587657191, 0.587657191, 0.587657191, 0.679221784, 0.802825172, 0.985869019, 0.985869019, 0.985869019, 0.985869019], degree=3))
            make_face()
        # profile 22 of 26: a face of its own
        with BuildSketch(Plane(origin=(0, 2.085, 0), x_dir=(1, 0, 0), z_dir=(0, 1, 0)).offset(BOSS_EXTRUDE3_START)):
            with BuildLine():
                Line((-13.760377803, -12.524946279), (-22.925529193, -12.524946279))
                ThreePointArc((-22.925529193, -12.524946279), (-23.237489148, -13.503417639), (-23.342953497, -14.524986279))
                ThreePointArc((-23.342953497, -14.524986279), (-21.878490939, -18.060476649), (-18.343003498, -19.524946279))
                ThreePointArc((-18.343003498, -19.524946279), (-15.760986009, -18.806703382), (-13.92078711, -16.858279612))
                ThreePointArc((-13.92078711, -16.858279612), (-13.489561285, -15.726854775), (-13.342953498, -14.524946279))
                ThreePointArc((-13.342953498, -14.524946279), (-13.448421933, -13.50339806), (-13.760377803, -12.524946279))
            make_face()
            with Locations((-18.342953498, -14.524946279)):
                Circle(SKETCH5_R, mode=Mode.SUBTRACT)
        # profile 23 of 26: a face of its own
        with BuildSketch(Plane(origin=(0, 2.085, 0), x_dir=(1, 0, 0), z_dir=(0, 1, 0)).offset(BOSS_EXTRUDE3_START)):
            with BuildLine():
                ThreePointArc((16.657046502, -14.524946279), (16.551578067, -13.50339806), (16.239622197, -12.524946279))
                Line((16.239622197, -12.524946279), (7.074470807, -12.524946279))
                ThreePointArc((7.074470807, -12.524946279), (6.66046873, -14.709907259), (7.234880115, -16.858279612))
                ThreePointArc((7.234880115, -16.858279612), (9.075079014, -18.806703382), (11.657096502, -19.524946279))
                ThreePointArc((11.657096502, -19.524946279), (15.192598086, -18.060462507), (16.657046502, -14.524946279))
            make_face()
            with Locations((11.657046502, -14.524946279)):
                Circle(SKETCH5_R, mode=Mode.SUBTRACT)
        # profile 24 of 26: a face of its own
        with BuildSketch(Plane(origin=(0, 2.085, 0), x_dir=(1, 0, 0), z_dir=(0, 1, 0)).offset(BOSS_EXTRUDE3_START)):
            with BuildLine():
                ThreePointArc((7.074470807, -12.524946279), (7.336728066, -12.008033764), (7.657046502, -11.524946279))
                Line((7.657046502, -11.524946279), (-1.5063675, -11.524946279))
                add(Edge.make_bspline(
                    [(2.668642966, -12.524946279), (2.373968563, -12.370639475), (1.668214709, -12.038259888), (0.265447838, -11.661549439), (-0.841891354, -11.530578403), (-1.5063675, -11.524946279)],
                    knots=[0.587657191, 0.587657191, 0.587657191, 0.587657191, 0.679221784, 0.802825172, 0.985869019, 0.985869019, 0.985869019, 0.985869019], degree=3))
                Line((2.668642966, -12.524946279), (7.074470807, -12.524946279))
            make_face()
        # profile 25 of 26: a face of its own
        with BuildSketch(Plane(origin=(0, 2.085, 0), x_dir=(1, 0, 0), z_dir=(0, 1, 0)).offset(BOSS_EXTRUDE3_START)):
            with BuildLine():
                Line((-9.354549961, -12.524946279), (-13.760377803, -12.524946279))
                ThreePointArc((-13.760377803, -12.524946279), (-13.448421933, -13.50339806), (-13.342953498, -14.524946279))
                ThreePointArc((-13.342953498, -14.524946279), (-13.489561285, -15.726854775), (-13.92078711, -16.858279612))
                add(Edge.make_bspline(
                    [(-13.92078711, -16.858279612), (-13.383745417, -15.856785937), (-12.232094855, -14.272593809), (-10.424029044, -13.117524925), (-9.557996846, -12.631481622), (-9.354549961, -12.524946279)],
                    knots=[0, 0, 0, 0, 0.31493804, 0.524439854, 0.587657191, 0.587657191, 0.587657191, 0.587657191], degree=3))
            make_face()
        # profile 26 of 26: a face of its own
        with BuildSketch(Plane(origin=(0, 2.085, 0), x_dir=(1, 0, 0), z_dir=(0, 1, 0)).offset(BOSS_EXTRUDE3_START)):
            with BuildLine():
                ThreePointArc((7.234880115, -16.858279612), (6.66046873, -14.709907259), (7.074470807, -12.524946279))
                Line((7.074470807, -12.524946279), (2.668642966, -12.524946279))
                add(Edge.make_bspline(
                    [(7.234880115, -16.858279612), (6.697838422, -15.856785937), (5.54618786, -14.272593809), (3.738122049, -13.117524925), (2.872089851, -12.631481622), (2.668642966, -12.524946279)],
                    knots=[0, 0, 0, 0, 0.31493804, 0.524439854, 0.587657191, 0.587657191, 0.587657191, 0.587657191], degree=3))
            make_face()
        extrude(amount=-BOSS_EXTRUDE3_DEPTH)
    add(part.part.scale(1), mode=Mode.REPLACE)  # the faces are merged on a copy

    # Fillet5: read off the stored shape, not the designer's step
    # Fillet5 outline → Fillet5 (add)
    with SkipClean():  # the faces are left unmerged after this step: merging them gives an invalid solid
        with BuildSketch(Plane(origin=(0, 0, 0), x_dir=(1, 0, 0), z_dir=(0, 1, 0)).offset(FILLET5_START)):
            with BuildLine():
                ThreePointArc((16.657046502, -14.524946279), (17.24283294, -13.110732717), (18.657046502, -12.524946279))
                Line((18.657046502, -12.524946279), (16.239622197, -12.524946279))
                ThreePointArc((16.239622197, -12.524946279), (16.551578067, -13.503398061), (16.657046502, -14.524946279))
            make_face()
            with BuildLine():
                ThreePointArc((-25.342953498, -12.524946279), (-23.928739935, -13.110732716), (-23.342953498, -14.524946279))
                ThreePointArc((-23.342953498, -14.524946279), (-23.237485063, -13.503398061), (-22.925529193, -12.524946279))
                Line((-22.925529193, -12.524946279), (-25.342953498, -12.524946279))
            make_face()
            with BuildLine():
                ThreePointArc((-23.342953498, 21.475053721), (-23.928739936, 20.060840158), (-25.342953498, 19.475053721))
                Line((-25.342953498, 19.475053721), (-22.925529193, 19.475053721))
                ThreePointArc((-22.925529193, 19.475053721), (-23.237485063, 20.453505503), (-23.342953498, 21.475053721))
            make_face()
            with BuildLine():
                ThreePointArc((18.657046502, 19.475053721), (17.24283294, 20.060840159), (16.657046502, 21.475053721))
                ThreePointArc((16.657046502, 21.475053721), (16.551578067, 20.453505503), (16.239622197, 19.475053721))
                Line((16.239622197, 19.475053721), (18.657046502, 19.475053721))
            make_face()
        extrude(amount=FILLET5_DEPTH)


solid = part.part
